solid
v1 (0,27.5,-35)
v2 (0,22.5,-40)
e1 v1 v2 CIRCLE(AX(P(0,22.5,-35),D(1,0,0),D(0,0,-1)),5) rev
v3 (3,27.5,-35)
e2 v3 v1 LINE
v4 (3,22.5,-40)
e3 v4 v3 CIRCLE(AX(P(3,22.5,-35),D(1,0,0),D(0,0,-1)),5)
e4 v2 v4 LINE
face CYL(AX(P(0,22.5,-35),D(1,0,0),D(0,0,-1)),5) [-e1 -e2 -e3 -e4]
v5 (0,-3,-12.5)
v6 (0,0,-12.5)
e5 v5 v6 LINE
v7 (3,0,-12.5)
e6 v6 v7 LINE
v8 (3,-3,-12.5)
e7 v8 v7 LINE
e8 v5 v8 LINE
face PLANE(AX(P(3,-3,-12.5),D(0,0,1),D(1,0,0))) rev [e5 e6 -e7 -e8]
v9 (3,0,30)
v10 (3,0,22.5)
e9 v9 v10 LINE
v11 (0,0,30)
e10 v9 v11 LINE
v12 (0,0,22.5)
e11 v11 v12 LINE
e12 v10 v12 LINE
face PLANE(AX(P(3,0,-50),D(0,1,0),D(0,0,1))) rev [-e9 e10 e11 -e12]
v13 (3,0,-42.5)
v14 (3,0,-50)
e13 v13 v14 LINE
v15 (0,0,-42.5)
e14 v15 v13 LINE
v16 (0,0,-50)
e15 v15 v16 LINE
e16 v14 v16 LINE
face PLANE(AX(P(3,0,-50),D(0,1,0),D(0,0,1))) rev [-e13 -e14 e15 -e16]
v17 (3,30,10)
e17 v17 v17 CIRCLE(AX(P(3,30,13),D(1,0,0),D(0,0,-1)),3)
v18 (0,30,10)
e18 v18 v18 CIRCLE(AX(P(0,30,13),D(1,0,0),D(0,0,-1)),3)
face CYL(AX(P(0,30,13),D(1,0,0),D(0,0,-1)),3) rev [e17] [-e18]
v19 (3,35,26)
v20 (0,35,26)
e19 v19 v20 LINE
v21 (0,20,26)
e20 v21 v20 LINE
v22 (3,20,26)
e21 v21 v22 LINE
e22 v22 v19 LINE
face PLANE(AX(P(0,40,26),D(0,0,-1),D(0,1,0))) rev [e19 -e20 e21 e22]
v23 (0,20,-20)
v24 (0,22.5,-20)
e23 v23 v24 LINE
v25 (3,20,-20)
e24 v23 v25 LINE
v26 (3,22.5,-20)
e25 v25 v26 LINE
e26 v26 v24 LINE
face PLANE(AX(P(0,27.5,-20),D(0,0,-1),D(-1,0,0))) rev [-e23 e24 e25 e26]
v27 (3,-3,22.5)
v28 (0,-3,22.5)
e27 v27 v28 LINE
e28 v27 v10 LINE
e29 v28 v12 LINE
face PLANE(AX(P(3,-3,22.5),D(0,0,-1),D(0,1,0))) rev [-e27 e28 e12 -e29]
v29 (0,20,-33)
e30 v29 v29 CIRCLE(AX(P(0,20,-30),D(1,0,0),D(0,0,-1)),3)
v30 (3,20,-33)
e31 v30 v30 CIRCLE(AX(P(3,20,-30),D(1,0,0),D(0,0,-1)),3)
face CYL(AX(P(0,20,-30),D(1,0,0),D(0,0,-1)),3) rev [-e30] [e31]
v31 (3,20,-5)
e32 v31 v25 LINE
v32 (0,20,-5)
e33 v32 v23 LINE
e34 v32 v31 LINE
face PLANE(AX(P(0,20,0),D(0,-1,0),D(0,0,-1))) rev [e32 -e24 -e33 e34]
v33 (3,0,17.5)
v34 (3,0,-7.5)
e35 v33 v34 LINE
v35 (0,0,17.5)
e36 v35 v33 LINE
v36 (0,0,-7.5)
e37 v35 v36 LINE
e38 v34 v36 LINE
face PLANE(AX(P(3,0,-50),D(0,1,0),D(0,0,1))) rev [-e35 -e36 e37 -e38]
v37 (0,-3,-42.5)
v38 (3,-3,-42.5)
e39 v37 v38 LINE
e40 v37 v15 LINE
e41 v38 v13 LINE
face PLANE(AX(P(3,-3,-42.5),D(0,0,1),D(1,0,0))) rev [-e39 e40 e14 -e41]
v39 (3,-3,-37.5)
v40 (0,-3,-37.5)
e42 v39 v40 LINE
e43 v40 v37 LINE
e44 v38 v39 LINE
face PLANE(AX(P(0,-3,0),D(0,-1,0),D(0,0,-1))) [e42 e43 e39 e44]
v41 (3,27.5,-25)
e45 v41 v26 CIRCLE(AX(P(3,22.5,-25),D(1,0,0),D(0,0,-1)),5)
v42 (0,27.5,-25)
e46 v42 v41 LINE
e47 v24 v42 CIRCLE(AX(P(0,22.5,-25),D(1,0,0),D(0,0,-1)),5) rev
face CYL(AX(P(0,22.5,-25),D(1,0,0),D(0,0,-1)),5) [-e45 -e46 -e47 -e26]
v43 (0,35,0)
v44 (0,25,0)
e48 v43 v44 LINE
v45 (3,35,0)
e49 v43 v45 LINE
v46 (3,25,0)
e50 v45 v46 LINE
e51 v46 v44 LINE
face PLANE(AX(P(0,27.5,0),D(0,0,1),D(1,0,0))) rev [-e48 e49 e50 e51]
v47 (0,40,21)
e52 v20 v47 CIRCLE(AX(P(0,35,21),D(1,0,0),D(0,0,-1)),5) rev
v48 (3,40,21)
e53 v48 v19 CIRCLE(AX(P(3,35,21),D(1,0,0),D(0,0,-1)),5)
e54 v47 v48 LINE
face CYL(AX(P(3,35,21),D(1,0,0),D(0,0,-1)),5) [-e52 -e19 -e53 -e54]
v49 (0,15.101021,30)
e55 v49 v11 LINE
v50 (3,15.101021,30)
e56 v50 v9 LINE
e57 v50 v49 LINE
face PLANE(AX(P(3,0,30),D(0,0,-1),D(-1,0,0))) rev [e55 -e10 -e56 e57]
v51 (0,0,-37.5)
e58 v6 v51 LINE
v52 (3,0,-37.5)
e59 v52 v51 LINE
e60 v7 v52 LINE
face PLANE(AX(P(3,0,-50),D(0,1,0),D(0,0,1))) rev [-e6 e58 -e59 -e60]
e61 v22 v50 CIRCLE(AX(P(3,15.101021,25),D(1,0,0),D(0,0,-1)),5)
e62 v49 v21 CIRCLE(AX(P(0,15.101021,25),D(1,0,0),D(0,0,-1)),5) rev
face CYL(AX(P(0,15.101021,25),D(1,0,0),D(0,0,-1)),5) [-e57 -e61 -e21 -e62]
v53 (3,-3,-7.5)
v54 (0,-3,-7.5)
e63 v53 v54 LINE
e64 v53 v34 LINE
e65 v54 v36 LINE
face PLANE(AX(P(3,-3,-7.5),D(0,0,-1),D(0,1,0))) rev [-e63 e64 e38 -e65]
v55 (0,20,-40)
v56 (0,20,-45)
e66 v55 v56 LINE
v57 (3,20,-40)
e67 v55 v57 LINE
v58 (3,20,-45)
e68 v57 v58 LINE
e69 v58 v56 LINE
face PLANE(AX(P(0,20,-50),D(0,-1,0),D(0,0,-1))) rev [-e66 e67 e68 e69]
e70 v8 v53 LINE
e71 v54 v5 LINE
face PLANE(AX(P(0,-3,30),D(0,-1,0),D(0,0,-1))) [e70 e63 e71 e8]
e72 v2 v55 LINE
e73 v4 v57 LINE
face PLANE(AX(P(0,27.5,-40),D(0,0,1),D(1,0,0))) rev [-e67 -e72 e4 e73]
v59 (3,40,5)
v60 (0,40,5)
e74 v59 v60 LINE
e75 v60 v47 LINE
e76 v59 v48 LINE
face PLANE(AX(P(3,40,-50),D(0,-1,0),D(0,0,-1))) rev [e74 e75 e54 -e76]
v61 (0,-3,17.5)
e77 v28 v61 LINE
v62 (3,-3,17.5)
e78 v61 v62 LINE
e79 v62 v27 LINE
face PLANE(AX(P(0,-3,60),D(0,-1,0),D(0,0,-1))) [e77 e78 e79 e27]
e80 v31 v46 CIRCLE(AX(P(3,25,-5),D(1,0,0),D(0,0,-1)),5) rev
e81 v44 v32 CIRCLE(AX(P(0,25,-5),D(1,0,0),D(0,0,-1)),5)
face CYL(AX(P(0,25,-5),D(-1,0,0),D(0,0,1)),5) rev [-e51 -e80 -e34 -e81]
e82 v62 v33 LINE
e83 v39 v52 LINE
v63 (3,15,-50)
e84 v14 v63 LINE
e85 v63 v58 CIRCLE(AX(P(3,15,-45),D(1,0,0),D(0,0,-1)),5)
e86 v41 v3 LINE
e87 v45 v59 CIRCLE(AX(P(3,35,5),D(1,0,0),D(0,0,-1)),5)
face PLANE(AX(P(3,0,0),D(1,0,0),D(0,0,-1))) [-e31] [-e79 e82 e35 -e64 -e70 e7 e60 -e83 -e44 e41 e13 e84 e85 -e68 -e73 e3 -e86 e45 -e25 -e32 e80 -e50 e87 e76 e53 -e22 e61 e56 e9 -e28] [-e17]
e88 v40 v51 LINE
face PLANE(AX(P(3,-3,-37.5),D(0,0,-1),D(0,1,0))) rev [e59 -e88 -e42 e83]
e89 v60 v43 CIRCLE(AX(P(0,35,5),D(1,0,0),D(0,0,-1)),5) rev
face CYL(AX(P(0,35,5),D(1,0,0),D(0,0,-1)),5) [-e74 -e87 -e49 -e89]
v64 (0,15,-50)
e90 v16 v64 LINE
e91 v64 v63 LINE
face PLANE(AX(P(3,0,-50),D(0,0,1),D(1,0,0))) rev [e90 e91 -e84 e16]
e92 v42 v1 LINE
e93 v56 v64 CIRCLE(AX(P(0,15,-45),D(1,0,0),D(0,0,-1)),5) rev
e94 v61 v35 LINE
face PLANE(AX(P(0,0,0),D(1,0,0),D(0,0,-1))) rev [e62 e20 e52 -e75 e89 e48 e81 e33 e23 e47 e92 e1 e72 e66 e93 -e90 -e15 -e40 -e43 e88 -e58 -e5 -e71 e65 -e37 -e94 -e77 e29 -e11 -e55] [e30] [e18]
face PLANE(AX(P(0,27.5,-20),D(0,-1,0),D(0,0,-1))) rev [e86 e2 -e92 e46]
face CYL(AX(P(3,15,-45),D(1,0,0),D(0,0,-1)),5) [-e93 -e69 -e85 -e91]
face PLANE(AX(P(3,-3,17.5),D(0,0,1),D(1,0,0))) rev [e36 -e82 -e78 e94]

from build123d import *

# Parameters (mm, degrees)
SKETCH1_W           = 80
SKETCH1_H           = 40
BOSS_EXTRUDE1_DEPTH = 3
SKETCH2_R           = 3
SKETCH2_W           = 4
SKETCH2_H           = 20
CUT_EXTRUDE1_DEPTH  = 65.101482042
FILLET2_R           = 5
SKETCH3_W           = 3
SKETCH3_H           = 5
BOSS_EXTRUDE2_DEPTH = 3
LPATTERN1_COUNT     = 3
LPATTERN1_PITCH     = 30


with BuildPart() as part:
    # Sketch1 → Boss-Extrude1 (new body)
    with BuildSketch(Plane(origin=(0, 0, 0), x_dir=(0, 0, -1), z_dir=(1, 0, 0))):
        with Locations((10, 20)):
            Rectangle(SKETCH1_W, SKETCH1_H)
    extrude(amount=BOSS_EXTRUDE1_DEPTH)

    # Sketch2 → Cut-Extrude1 (cut, through all)
    with BuildSketch(Plane(origin=(3, 0, 0), x_dir=(0, 0, -1), z_dir=(1, 0, 0))):
        with Locations((30, 20)):
            Circle(SKETCH2_R)
        with Locations((-13, 30)):
            Circle(SKETCH2_R)
        Polygon((0, 40), (50, 40), (50, 27.5), (50, 20), (40, 20), (40, 27.5), (20, 27.5), (20, 20), (0, 20), (0, 27.5), align=None)
        with Locations((-28, 30)):
            Rectangle(SKETCH2_W, SKETCH2_H)
    extrude(amount=-CUT_EXTRUDE1_DEPTH, mode=Mode.SUBTRACT)

    # Fillet2
    # the kernel refuses this fillet: 5 mm, written as the material it adds along each edge
    with BuildSketch(Plane(origin=(3, 20, 0), x_dir=(0, 0, -1), z_dir=(-1, 0, 0))) as fillet2_piece_1:
        with BuildLine():
            CenterArc((FILLET2_R, -FILLET2_R), FILLET2_R, 90, 90)
            Line((0, -FILLET2_R), (0, 0))
            Line((0, 0), (FILLET2_R, 0))
        make_face()
    extrude(amount=3)
    # the kernel refuses this fillet: 5 mm, written as the material it takes off along each edge
    with BuildSketch(Plane(origin=(15.5, 40, 26), x_dir=(0, 0, -1), z_dir=(-1, 0, 0)), Plane(origin=(15.5, 27.5, -40), x_dir=(0, -1, 0), z_dir=(-1, 0, 0)), Plane(origin=(15.5, 27.5, -20), x_dir=(0, 0, -1), z_dir=(-1, 0, 0)), Plane(origin=(15.5, 40, 0), x_dir=(0, -1, 0), z_dir=(-1, 0, 0)), Plane(origin=(15.5, 20, -50), x_dir=(0, -1, 0), z_dir=(-1, 0, 0))) as fillet2_2_piece_1:
        with BuildLine():
            CenterArc((FILLET2_R, FILLET2_R), FILLET2_R, 180, 90)
            Line((0, FILLET2_R), (0, 0))
            Line((0, 0), (FILLET2_R, 0))
        make_face()
    extrude(amount=28, mode=Mode.SUBTRACT)
    with BuildSketch(Plane(origin=(15.247448714, 20, 30), x_dir=(0, -1, 0), z_dir=(-1, 0, 0))) as fillet2_2_piece_2:
        with BuildLine():
            CenterArc((4.898979486, -5), FILLET2_R, 90, 78.463040967)
            Line((0, -4), (0, 0))
            Line((0, 0), (4.898979486, 0))
        make_face()
    extrude(amount=27.494897428, mode=Mode.SUBTRACT)

    # Sketch3 → Boss-Extrude2 (add)
    with BuildSketch(Plane.XZ):
        with Locations((1.5, -40)):
            Rectangle(SKETCH3_W, SKETCH3_H)
    boss_extrude2 = extrude(amount=BOSS_EXTRUDE2_DEPTH)

    # LPattern1: Boss-Extrude2 ×3
    with Locations(*[(0, 0, i * LPATTERN1_PITCH) for i in range(1, LPATTERN1_COUNT)]):
        add(boss_extrude2)


solid = part.part
